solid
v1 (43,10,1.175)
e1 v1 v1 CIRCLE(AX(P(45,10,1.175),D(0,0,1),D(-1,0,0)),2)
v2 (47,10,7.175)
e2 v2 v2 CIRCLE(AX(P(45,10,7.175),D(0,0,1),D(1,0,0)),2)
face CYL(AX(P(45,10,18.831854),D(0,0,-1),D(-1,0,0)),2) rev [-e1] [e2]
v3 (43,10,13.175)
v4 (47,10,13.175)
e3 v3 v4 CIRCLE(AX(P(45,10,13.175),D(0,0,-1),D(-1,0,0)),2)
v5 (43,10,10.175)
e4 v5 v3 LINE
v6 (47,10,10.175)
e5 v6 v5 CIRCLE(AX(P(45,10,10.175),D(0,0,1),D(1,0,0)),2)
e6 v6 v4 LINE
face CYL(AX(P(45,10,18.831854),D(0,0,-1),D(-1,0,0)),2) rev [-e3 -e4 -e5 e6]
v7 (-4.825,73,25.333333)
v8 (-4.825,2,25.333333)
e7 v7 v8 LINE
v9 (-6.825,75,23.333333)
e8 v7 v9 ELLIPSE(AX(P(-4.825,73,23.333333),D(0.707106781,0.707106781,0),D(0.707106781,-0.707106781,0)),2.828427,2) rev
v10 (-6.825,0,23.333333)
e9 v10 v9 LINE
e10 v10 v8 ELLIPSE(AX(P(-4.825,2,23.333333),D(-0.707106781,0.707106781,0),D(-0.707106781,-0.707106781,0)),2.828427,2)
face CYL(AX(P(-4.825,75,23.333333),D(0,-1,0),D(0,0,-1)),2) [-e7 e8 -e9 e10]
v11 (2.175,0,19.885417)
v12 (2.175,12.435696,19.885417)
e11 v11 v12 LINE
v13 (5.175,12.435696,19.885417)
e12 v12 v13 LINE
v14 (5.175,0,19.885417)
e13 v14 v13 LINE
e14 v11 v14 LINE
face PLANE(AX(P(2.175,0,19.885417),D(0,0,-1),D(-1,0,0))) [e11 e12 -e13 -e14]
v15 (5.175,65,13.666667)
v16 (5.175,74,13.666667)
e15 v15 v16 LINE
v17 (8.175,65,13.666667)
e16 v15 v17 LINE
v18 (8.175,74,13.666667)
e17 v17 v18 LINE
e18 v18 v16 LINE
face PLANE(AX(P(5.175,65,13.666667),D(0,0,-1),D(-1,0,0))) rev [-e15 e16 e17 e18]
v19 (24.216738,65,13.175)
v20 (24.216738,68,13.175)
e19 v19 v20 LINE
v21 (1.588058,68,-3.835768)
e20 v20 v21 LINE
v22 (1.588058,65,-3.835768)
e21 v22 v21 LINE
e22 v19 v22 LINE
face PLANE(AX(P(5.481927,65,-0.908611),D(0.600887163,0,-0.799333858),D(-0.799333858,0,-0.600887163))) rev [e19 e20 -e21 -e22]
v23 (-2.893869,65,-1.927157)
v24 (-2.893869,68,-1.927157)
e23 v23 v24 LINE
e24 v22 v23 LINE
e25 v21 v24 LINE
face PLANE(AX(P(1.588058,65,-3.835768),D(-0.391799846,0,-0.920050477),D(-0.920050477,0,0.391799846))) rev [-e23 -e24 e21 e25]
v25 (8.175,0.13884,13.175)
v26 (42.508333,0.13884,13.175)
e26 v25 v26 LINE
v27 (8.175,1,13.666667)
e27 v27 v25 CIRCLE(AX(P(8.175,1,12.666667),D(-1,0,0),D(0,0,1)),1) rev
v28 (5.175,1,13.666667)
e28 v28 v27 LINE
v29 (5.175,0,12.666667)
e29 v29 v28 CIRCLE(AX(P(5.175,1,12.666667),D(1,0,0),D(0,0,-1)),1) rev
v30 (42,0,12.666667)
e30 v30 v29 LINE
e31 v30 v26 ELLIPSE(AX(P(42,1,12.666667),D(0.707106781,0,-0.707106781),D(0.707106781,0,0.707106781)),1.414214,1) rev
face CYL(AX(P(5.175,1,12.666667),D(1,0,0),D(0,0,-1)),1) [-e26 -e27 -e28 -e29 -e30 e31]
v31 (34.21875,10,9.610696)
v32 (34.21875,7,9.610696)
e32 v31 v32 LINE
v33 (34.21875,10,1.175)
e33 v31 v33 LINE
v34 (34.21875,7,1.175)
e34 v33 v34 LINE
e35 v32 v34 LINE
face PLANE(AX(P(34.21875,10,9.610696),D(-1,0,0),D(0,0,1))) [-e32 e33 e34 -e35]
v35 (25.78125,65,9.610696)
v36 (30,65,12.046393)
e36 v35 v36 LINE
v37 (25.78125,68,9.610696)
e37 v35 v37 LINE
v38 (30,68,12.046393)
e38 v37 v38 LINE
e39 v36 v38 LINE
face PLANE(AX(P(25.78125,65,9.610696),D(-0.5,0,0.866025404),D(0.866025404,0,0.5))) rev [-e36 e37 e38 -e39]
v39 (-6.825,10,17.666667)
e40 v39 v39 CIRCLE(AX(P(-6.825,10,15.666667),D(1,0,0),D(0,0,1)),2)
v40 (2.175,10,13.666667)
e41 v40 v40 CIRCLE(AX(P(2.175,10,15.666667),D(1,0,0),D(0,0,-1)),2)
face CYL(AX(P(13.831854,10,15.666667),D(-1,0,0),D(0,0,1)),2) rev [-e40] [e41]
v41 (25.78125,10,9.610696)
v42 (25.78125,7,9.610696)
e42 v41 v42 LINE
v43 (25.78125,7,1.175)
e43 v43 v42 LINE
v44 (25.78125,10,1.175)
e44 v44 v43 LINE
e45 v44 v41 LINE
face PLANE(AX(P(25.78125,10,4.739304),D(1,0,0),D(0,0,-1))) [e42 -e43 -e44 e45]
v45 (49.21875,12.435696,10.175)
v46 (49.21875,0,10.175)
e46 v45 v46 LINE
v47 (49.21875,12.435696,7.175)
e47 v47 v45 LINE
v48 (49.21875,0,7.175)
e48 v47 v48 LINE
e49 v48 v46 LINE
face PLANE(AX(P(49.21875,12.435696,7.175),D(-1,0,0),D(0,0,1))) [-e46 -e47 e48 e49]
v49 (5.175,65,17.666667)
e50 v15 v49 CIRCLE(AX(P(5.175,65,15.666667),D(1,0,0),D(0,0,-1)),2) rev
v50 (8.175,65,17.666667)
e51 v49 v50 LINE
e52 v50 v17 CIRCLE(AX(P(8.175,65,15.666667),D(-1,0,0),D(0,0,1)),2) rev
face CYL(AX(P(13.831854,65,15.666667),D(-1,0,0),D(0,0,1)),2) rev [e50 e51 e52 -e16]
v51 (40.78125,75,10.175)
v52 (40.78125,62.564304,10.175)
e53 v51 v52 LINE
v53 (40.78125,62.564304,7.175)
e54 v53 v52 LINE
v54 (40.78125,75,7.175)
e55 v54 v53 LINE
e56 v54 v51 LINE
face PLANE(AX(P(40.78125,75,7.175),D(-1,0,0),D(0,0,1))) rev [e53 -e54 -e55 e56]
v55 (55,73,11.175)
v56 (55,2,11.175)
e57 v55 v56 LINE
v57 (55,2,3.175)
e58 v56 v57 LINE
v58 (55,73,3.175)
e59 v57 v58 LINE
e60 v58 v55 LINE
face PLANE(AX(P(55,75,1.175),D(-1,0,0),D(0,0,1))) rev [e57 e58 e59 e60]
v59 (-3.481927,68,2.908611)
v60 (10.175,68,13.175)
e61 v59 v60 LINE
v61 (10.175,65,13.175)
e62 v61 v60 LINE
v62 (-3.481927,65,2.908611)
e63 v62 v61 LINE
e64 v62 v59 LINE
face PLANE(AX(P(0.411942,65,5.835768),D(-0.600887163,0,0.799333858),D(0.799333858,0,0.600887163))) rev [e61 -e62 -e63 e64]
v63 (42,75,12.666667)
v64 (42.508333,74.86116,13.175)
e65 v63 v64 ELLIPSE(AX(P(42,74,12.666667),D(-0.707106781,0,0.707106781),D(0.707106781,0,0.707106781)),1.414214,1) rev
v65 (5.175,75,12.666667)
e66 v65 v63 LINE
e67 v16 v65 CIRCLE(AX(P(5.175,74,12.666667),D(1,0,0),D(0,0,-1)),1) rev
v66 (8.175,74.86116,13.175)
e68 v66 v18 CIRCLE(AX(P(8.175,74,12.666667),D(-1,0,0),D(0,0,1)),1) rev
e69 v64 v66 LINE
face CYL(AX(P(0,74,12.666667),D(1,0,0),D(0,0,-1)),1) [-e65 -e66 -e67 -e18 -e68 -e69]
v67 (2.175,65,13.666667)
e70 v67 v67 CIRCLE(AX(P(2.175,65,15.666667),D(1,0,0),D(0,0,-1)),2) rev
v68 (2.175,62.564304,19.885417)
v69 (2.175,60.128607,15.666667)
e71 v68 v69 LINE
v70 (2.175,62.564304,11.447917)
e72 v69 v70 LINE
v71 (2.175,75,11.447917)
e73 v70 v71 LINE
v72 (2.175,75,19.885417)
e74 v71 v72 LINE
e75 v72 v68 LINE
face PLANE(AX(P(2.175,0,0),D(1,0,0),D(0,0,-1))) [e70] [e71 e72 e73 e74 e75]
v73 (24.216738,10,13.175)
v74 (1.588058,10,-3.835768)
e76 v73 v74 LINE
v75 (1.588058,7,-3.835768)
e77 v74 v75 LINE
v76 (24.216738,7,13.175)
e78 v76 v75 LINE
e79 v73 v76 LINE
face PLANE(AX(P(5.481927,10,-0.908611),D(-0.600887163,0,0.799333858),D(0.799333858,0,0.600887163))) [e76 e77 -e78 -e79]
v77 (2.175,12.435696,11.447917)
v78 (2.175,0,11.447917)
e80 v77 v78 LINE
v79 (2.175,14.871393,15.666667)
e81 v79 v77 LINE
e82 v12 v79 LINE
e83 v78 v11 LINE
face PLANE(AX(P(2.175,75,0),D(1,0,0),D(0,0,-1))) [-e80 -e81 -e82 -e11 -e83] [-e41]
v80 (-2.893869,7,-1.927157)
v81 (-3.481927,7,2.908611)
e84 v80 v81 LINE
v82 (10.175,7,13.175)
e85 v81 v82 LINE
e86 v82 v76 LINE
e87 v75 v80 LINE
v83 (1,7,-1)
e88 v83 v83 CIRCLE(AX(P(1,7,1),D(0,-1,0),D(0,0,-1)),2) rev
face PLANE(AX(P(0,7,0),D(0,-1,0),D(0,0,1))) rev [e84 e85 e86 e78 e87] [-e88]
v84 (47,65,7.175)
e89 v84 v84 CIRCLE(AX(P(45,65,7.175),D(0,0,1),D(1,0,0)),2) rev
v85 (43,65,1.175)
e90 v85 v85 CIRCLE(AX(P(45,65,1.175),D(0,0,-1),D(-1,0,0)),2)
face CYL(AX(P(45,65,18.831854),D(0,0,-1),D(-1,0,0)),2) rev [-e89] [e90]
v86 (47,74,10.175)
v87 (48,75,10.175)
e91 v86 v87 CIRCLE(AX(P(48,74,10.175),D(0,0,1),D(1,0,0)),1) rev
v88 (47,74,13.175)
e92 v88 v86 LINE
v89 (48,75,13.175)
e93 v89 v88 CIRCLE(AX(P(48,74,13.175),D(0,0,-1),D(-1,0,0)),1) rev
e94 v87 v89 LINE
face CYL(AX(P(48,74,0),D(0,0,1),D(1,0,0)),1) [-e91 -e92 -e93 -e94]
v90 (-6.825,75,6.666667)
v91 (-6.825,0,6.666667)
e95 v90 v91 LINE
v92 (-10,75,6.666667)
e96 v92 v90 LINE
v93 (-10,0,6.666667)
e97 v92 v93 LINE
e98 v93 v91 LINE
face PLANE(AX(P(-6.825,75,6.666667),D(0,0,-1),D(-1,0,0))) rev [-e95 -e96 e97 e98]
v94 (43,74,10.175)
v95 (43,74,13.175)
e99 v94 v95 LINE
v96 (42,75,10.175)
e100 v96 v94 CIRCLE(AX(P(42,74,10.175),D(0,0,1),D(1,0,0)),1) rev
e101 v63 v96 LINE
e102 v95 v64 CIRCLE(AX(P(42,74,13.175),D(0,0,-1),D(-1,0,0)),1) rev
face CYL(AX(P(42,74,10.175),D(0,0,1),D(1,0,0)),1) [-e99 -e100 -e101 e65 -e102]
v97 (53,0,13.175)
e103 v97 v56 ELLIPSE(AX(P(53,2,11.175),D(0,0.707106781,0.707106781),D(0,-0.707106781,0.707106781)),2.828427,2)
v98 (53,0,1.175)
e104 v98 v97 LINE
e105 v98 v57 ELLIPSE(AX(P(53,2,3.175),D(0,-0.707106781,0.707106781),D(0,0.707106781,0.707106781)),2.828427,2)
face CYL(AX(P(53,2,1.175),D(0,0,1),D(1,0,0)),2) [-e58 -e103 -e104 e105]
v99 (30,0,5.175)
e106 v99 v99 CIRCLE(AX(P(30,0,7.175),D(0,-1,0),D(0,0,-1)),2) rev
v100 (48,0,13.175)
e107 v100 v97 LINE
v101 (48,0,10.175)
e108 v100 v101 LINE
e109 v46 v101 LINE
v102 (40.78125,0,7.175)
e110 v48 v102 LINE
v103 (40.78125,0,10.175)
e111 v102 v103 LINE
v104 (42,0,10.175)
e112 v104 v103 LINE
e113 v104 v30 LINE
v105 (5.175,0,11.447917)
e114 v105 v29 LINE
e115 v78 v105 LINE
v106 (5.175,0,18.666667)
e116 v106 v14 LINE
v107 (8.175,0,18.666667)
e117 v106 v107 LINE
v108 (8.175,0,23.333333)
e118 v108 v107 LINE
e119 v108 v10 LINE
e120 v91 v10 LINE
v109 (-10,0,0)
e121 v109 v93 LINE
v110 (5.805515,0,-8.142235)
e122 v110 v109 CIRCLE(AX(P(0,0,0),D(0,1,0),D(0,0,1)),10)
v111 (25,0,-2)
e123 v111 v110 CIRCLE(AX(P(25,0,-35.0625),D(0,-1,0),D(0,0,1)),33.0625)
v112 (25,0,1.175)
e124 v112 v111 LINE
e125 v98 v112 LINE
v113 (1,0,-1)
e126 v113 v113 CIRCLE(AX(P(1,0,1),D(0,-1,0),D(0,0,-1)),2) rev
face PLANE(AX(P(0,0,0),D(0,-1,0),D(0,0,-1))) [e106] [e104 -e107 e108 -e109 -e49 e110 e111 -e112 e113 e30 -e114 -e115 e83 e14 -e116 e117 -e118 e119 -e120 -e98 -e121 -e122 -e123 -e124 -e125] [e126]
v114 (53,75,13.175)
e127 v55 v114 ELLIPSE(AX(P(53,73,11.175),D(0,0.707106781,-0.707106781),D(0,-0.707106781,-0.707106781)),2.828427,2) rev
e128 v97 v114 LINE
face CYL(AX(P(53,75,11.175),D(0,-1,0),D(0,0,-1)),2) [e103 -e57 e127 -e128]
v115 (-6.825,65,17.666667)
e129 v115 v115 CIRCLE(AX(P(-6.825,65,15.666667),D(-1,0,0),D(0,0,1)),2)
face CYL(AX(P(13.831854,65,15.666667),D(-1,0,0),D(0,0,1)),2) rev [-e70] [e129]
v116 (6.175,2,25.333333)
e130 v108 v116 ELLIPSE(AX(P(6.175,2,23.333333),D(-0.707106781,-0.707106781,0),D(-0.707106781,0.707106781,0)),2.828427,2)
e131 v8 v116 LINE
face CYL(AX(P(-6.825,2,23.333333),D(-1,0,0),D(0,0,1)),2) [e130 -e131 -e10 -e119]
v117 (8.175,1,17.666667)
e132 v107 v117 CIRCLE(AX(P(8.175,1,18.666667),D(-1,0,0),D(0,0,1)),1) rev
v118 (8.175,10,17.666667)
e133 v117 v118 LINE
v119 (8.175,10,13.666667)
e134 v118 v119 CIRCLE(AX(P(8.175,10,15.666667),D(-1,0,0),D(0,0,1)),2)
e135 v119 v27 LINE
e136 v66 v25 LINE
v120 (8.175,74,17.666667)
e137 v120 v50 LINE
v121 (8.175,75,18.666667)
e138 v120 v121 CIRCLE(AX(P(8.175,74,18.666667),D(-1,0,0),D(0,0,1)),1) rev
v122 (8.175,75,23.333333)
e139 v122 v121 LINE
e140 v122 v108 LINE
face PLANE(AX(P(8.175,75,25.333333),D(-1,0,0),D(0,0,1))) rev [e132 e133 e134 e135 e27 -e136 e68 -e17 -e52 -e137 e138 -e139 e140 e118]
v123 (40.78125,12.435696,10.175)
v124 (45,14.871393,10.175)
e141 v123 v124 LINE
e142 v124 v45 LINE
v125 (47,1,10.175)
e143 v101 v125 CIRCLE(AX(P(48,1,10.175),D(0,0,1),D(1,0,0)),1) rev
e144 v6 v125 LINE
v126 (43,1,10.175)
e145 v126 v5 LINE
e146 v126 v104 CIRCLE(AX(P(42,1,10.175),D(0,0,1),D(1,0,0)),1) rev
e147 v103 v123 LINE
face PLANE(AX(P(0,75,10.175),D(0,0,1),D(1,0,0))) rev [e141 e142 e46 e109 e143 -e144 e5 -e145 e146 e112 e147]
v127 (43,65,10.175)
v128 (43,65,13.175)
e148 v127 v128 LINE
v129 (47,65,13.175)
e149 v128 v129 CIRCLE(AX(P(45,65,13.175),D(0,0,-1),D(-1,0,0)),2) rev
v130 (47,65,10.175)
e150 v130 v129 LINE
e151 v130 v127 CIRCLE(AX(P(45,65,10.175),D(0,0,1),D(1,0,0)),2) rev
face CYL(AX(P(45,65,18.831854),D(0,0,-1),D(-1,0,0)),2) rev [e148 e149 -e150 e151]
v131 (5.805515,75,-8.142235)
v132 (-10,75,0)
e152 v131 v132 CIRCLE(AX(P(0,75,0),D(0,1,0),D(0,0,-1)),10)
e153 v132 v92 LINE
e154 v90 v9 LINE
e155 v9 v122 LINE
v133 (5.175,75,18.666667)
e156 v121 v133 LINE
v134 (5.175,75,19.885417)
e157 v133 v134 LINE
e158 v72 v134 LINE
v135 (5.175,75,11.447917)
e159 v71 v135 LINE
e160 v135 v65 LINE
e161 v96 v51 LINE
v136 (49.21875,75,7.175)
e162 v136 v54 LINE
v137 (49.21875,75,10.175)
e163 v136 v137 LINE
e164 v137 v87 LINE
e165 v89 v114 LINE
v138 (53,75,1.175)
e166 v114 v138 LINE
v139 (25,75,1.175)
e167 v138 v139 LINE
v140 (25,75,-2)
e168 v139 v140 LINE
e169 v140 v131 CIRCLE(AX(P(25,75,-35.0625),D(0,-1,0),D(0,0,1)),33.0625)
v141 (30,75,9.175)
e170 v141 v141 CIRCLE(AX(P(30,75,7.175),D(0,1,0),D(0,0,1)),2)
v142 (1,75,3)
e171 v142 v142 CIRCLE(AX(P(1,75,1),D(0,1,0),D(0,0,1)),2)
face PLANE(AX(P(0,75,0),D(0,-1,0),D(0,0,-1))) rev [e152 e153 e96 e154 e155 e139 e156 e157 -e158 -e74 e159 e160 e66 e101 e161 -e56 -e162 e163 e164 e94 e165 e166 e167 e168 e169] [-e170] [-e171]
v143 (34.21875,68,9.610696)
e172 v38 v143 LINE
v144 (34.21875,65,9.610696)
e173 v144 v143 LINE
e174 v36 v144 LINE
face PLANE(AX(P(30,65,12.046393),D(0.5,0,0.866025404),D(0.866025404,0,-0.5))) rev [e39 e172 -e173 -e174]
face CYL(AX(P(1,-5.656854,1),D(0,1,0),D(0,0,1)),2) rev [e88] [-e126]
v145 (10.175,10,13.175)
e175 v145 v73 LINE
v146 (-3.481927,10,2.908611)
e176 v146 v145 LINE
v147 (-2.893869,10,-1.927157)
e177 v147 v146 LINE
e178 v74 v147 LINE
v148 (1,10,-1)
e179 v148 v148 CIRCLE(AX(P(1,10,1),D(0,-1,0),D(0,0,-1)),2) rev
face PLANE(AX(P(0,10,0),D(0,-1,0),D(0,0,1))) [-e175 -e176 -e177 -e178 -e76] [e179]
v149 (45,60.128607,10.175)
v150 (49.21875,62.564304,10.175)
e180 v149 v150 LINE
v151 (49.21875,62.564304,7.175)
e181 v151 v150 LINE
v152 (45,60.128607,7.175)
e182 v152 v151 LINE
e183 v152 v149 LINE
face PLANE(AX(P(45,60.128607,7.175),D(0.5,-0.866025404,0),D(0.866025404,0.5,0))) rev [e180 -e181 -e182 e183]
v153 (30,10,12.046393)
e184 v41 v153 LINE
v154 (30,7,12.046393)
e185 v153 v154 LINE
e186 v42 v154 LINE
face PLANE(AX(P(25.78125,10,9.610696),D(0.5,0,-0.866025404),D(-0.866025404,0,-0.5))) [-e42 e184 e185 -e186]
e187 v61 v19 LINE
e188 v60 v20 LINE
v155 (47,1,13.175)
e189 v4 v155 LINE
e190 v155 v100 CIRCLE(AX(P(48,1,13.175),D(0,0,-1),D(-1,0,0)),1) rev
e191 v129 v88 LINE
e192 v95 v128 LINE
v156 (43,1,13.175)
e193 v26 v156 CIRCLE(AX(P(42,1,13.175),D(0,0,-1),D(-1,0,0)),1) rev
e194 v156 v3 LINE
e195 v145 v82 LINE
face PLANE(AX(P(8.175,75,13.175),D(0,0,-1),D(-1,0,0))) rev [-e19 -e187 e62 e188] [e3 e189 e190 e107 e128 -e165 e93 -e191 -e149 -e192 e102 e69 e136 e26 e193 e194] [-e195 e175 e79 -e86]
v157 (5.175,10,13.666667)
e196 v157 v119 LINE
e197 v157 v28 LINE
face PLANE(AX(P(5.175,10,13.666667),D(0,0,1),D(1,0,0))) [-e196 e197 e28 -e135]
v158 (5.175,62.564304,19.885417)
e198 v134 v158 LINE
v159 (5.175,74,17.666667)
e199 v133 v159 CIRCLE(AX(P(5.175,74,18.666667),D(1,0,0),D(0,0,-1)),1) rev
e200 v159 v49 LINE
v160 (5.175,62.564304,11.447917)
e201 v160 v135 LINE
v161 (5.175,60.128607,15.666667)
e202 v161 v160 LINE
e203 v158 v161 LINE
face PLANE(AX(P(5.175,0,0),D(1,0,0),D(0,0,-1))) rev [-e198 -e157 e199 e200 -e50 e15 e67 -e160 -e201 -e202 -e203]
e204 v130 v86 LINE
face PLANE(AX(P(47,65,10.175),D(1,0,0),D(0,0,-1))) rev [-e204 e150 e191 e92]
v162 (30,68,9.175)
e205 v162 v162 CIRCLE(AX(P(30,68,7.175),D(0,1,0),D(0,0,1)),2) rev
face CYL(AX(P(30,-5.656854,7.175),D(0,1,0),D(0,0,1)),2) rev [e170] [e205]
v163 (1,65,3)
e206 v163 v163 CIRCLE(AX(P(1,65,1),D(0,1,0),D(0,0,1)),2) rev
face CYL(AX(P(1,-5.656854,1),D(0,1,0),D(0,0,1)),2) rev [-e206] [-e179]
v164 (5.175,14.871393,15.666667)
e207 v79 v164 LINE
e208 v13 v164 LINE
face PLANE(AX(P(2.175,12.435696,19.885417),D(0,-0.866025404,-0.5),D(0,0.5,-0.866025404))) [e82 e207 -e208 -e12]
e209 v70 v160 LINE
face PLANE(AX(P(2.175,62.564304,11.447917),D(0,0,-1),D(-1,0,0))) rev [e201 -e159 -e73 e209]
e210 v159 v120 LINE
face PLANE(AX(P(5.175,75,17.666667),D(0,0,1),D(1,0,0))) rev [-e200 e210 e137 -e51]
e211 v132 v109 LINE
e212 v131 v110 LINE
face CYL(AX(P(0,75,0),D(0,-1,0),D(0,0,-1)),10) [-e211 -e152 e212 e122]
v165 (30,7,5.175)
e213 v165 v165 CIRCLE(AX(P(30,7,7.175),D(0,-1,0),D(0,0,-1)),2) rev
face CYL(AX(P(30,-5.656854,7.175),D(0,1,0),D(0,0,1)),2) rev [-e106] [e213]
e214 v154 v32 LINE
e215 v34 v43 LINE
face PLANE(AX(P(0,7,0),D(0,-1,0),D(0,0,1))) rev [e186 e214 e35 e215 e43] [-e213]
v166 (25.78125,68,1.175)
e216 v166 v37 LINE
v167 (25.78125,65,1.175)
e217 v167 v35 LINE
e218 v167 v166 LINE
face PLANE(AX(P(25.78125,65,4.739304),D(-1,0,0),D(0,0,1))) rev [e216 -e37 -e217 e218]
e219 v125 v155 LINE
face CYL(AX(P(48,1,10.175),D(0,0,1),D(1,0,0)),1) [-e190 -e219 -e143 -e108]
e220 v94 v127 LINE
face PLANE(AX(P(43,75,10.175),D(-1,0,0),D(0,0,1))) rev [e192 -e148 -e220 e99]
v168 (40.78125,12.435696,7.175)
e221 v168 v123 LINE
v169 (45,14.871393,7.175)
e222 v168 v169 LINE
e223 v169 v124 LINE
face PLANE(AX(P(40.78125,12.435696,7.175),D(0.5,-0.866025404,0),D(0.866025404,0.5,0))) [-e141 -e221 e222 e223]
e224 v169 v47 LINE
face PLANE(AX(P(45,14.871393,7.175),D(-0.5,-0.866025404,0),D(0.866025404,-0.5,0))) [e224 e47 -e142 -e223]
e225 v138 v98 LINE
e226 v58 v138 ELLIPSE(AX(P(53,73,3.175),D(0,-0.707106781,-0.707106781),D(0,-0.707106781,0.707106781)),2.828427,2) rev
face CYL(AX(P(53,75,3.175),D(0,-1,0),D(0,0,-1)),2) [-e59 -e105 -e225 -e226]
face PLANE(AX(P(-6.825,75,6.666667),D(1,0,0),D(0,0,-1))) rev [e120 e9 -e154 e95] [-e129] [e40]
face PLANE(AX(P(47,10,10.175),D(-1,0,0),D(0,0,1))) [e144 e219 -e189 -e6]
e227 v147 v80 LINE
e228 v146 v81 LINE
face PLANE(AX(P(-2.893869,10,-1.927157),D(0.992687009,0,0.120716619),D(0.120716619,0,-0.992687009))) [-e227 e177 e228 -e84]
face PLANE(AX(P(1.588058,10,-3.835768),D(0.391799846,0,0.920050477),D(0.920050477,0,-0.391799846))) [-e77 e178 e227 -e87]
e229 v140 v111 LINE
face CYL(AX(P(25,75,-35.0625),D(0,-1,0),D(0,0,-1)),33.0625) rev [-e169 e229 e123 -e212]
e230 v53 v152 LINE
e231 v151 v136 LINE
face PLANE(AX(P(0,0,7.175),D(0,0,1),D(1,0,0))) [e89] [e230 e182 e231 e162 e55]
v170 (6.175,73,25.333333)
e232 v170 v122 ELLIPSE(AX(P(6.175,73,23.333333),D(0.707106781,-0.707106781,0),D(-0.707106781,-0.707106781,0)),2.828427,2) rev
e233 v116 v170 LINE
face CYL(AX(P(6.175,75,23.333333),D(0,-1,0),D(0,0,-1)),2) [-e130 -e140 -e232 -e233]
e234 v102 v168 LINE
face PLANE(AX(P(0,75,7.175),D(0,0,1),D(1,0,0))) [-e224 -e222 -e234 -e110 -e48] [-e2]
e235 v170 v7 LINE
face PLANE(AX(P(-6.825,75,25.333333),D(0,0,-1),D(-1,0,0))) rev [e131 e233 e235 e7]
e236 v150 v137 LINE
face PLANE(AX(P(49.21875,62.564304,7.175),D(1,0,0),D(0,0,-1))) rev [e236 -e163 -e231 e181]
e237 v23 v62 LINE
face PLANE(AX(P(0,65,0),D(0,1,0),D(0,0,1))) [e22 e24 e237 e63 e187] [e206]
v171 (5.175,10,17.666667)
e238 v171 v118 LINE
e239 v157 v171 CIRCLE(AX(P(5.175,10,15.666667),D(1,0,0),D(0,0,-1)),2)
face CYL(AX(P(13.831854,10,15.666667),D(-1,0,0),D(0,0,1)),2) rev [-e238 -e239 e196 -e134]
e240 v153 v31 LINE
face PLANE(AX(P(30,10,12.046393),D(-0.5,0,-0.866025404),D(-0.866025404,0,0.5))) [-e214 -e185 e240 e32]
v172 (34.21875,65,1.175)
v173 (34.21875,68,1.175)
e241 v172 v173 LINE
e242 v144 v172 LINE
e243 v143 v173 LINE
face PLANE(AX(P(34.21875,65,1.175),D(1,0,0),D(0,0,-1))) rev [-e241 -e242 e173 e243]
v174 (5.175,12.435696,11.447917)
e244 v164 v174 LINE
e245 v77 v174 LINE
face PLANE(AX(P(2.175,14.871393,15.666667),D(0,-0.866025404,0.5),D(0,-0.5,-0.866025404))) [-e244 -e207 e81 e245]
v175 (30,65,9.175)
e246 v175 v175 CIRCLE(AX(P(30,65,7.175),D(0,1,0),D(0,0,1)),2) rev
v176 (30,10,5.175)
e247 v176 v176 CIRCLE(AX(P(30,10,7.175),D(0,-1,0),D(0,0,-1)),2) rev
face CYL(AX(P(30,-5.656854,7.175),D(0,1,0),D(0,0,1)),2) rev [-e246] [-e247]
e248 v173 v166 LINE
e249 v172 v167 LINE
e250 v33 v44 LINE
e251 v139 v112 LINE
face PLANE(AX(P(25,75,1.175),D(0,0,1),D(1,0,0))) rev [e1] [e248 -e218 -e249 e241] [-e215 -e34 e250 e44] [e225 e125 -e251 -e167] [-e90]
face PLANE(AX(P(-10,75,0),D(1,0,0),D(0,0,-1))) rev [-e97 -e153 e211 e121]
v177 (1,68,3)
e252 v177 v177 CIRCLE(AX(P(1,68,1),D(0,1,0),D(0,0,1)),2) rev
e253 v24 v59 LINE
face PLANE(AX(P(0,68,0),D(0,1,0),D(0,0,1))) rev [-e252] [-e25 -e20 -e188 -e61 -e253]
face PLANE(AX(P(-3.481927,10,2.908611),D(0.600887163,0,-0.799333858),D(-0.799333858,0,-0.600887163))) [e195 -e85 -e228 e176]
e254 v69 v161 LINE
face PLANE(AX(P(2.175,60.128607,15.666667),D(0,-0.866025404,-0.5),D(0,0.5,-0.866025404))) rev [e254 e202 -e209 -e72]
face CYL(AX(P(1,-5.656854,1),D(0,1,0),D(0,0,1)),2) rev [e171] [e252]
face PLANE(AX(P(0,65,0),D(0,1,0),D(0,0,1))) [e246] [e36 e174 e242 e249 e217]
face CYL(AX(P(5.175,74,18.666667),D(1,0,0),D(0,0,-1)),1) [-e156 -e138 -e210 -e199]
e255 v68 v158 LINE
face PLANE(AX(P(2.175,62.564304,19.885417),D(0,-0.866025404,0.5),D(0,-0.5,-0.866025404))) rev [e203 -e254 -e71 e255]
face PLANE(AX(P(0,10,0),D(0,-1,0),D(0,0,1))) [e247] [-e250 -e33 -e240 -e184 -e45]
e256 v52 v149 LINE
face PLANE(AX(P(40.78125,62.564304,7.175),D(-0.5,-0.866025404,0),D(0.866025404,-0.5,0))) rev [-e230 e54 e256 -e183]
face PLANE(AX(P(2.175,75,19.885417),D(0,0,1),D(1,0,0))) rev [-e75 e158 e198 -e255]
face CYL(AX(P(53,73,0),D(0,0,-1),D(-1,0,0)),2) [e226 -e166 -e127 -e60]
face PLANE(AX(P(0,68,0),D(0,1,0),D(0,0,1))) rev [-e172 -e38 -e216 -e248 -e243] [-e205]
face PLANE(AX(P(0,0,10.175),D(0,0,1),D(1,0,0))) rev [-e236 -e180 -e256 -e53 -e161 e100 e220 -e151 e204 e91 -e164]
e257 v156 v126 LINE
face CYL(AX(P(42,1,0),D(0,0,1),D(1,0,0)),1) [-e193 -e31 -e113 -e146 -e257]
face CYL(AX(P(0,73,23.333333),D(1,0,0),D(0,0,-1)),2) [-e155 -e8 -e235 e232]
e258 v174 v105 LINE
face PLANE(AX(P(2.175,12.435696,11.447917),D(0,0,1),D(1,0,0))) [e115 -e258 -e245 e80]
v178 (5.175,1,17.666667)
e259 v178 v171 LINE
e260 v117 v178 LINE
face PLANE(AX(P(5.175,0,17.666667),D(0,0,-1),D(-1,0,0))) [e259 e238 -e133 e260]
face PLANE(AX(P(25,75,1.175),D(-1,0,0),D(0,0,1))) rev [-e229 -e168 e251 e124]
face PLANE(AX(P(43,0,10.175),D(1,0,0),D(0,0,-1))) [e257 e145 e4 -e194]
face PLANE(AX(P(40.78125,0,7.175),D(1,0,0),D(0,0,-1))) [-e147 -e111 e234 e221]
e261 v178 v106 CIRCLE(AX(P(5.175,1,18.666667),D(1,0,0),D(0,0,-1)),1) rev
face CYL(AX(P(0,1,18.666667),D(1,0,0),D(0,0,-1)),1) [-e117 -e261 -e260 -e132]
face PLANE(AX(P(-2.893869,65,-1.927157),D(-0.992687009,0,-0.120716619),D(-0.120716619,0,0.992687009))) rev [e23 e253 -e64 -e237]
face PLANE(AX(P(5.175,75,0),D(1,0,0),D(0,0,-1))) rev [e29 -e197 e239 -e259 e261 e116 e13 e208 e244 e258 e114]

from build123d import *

# Parameters (mm, degrees)
BOSS_EXTRUDE1_DEPTH = 75
SKETCH2_R           = 2
CUT_EXTRUDE1_DEPTH  = 15
SKETCH4_R           = 2
CUT_EXTRUDE2_DEPTH  = 12
SKETCH3_R           = 2
CUT_EXTRUDE3_DEPTH  = 75
CUT_EXTRUDE4_START  = -3
CUT_EXTRUDE4_DEPTH  = 3
CUT_EXTRUDE5_START  = -3
CUT_EXTRUDE5_DEPTH  = 3
CUT_EXTRUDE6_START  = -3
CUT_EXTRUDE6_DEPTH  = 3
CUT_EXTRUDE7_START  = -3
CUT_EXTRUDE7_DEPTH  = 3
CUT_EXTRUDE8_START  = -7
CUT_EXTRUDE8_DEPTH  = 3
FILLET2_START       = 5.175
FILLET2_DEPTH       = 42.1845
FILLET2_START_2     = 10.175
FILLET2_2_DEPTH     = 3.491666667
FILLET2_3_DEPTH     = 37.825
FILLET3_R           = 2


with BuildPart() as part:
    # Sketch1 → Boss-Extrude1 (new body)
    with BuildSketch(Plane(origin=(0, 0, 0), x_dir=(1, 0, 0), z_dir=(0, 1, 0))):
        with BuildLine():
            Line((-6.825, -6.666666667), (-6.825, -25.333333333))
            Line((-6.825, -25.333333333), (8.175, -25.333333333))
            Line((8.175, -25.333333333), (8.175, -13.175))
            Line((8.175, -13.175), (55, -13.175))
            Line((55, -13.175), (55, -1.175))
            Line((55, -1.175), (25, -1.175))
            Line((25, -1.175), (25, 2))
            ThreePointArc((25, 2), (14.923352523, 3.572976633), (5.805515239, 8.142235123))
            ThreePointArc((5.805515239, 8.142235123), (3.047757271, 9.524241472), (0, 10))
            ThreePointArc((0, 10), (-7.071067812, 7.071067812), (-10, 0))
            Line((-10, 0), (-10, -6.666666667))
            Line((-10, -6.666666667), (-6.825, -6.666666667))
        make_face()
    extrude(amount=BOSS_EXTRUDE1_DEPTH)

    # Sketch2 → Cut-Extrude1 (cut)
    with BuildSketch(Plane.ZY.offset(6.825)):
        with Locations((15.666666667, 65)):
            Circle(SKETCH2_R)
    cut_extrude1 = extrude(amount=-CUT_EXTRUDE1_DEPTH, mode=Mode.SUBTRACT)

    # Sketch4 → Cut-Extrude2 (cut)
    with BuildSketch(Plane(origin=(0, 0, 1.175), x_dir=(-1, 0, 0), z_dir=(0, 0, -1))):
        with Locations((-45, 65)):
            Circle(SKETCH4_R)
    cut_extrude2 = extrude(amount=-CUT_EXTRUDE2_DEPTH, mode=Mode.SUBTRACT)

    # Sketch3 → Cut-Extrude3 (cut)
    with BuildSketch(Plane(origin=(0, 75, 0), x_dir=(1, 0, 0), z_dir=(0, 1, 0))):
        with Locations(Location((1, -1, 0), (0, 0, 270))):
            Circle(SKETCH3_R)
        with Locations(Location((30, -7.175, 0), (0, 0, 270))):
            Circle(SKETCH3_R)
    extrude(amount=-CUT_EXTRUDE3_DEPTH, mode=Mode.SUBTRACT)

    # Sketch5 → Cut-Extrude4 (cut)
    with BuildSketch(Plane(origin=(8.175, 0, 0), x_dir=(0, 0, -1), z_dir=(1, 0, 0)).offset(CUT_EXTRUDE4_START)):
        Polygon((-19.885416667, 62.564303552), (-15.666666667, 60.128607104), (-11.447916667, 62.564303552), (-11.447916667, 75), (-19.885416667, 75), align=None)
    cut_extrude4 = extrude(amount=-CUT_EXTRUDE4_DEPTH, mode=Mode.SUBTRACT)

    # Sketch6 → Cut-Extrude5 (cut)
    with BuildSketch(Plane(origin=(8.175, 0, 0), x_dir=(0, 0, -1), z_dir=(1, 0, 0)).offset(CUT_EXTRUDE5_START)):
        with BuildLine():
            Line((-13.666666667, 65), (-13.666666667, 75))
            Line((-13.666666667, 75), (-17.666666667, 75))
            Line((-17.666666667, 75), (-17.666666667, 65))
            ThreePointArc((-17.666666667, 65), (-15.666666667, 67), (-13.666666667, 65))
        make_face()
    cut_extrude5 = extrude(amount=CUT_EXTRUDE5_DEPTH, mode=Mode.SUBTRACT)

    # Sketch7 → Cut-Extrude6 (cut)
    with BuildSketch(Plane.XY.offset(13.175).offset(CUT_EXTRUDE6_START)):
        Polygon((40.78125, 62.564303552), (45, 60.128607104), (49.21875, 62.564303552), (49.21875, 75), (40.78125, 75), align=None)
    cut_extrude6 = extrude(amount=-CUT_EXTRUDE6_DEPTH, mode=Mode.SUBTRACT)

    # Sketch8 → Cut-Extrude7 (cut)
    with BuildSketch(Plane.XY.offset(13.175).offset(CUT_EXTRUDE7_START)):
        with BuildLine():
            Line((47, 65), (47, 75))
            Line((47, 75), (43, 75))
            Line((43, 75), (43, 65))
            ThreePointArc((43, 65), (45, 67), (47, 65))
        make_face()
    cut_extrude7 = extrude(amount=CUT_EXTRUDE7_DEPTH, mode=Mode.SUBTRACT)

    # Sketch10 → Cut-Extrude8 (cut)
    with BuildSketch(Plane(origin=(0, 75, 0), x_dir=(1, 0, 0), z_dir=(0, 1, 0)).offset(CUT_EXTRUDE8_START)):
        Polygon((0.411941919, -5.835768444), (10.175, -13.175), (24.216737808, -13.175), (5.48192736, 0.908610985), (1.588058081, 3.835768444), (-2.893869279, 1.927157459), (-3.48192736, -2.908610985), align=None)
        Polygon((25.78125, -4.739303552), (25.78125, -1.175), (34.21875, -1.175), (34.21875, -4.739303552), (34.21875, -9.610696448), (30, -12.046392896), (25.78125, -9.610696448), align=None)
    cut_extrude8 = extrude(amount=-CUT_EXTRUDE8_DEPTH, mode=Mode.SUBTRACT)

    # Mirror2: Cut-Extrude1, Cut-Extrude2, Cut-Extrude4, Cut-Extrude5, Cut-Extrude6, Cut-Extrude7, Cut-Extrude8 across plane
    add(cut_extrude1.mirror(Plane.ZX.offset(37.5)), mode=Mode.SUBTRACT)
    add(cut_extrude2.mirror(Plane.ZX.offset(37.5)), mode=Mode.SUBTRACT)
    add(cut_extrude4.mirror(Plane.ZX.offset(37.5)), mode=Mode.SUBTRACT)
    add(cut_extrude5.mirror(Plane.ZX.offset(37.5)), mode=Mode.SUBTRACT)
    add(cut_extrude6.mirror(Plane.ZX.offset(37.5)), mode=Mode.SUBTRACT)
    add(cut_extrude7.mirror(Plane.ZX.offset(37.5)), mode=Mode.SUBTRACT)
    add(cut_extrude8.mirror(Plane.ZX.offset(37.5)), mode=Mode.SUBTRACT)

    # Fillet2: read off the stored shape, not the designer's step
    # Fillet2 outline → Fillet2 (cut)
    with BuildSketch(Plane.YZ.offset(FILLET2_START)):
        with BuildLine():
            Line((1, 13.666666667), (0, 13.666666667))
            Line((0, 13.666666667), (0, 12.666666667))
            ThreePointArc((0, 12.666666667), (0.292893219, 13.373773448), (1, 13.666666667))
        make_face()
        with BuildLine():
            ThreePointArc((1, 17.666666667), (0.292893218, 17.959559886), (0, 18.666666667))
            Line((0, 18.666666667), (0, 17.666666667))
            Line((0, 17.666666667), (1, 17.666666667))
        make_face()
    extrude(amount=FILLET2_DEPTH, mode=Mode.SUBTRACT)

    # Fillet2 2 outline → Fillet2 2 (cut)
    with BuildSketch(Plane.XY.offset(FILLET2_START_2)):
        with BuildLine():
            Line((47, 1), (47, 0))
            Line((47, 0), (47.3595, 0))
            Line((47.3595, 0), (48, 0))
            ThreePointArc((48, 0), (47.292893219, 0.292893219), (47, 1))
        make_face()
        with BuildLine():
            Line((48, 75), (47, 75))
            Line((47, 75), (47, 74))
            ThreePointArc((47, 74), (47.292893219, 74.707106781), (48, 75))
        make_face()
        with BuildLine():
            Line((43, 75), (42, 75))
            ThreePointArc((42, 75), (42.707106781, 74.707106781), (43, 74))
            Line((43, 74), (43, 75))
        make_face()
        with BuildLine():
            ThreePointArc((43, 1), (42.707106781, 0.292893219), (42, 0))
            Line((42, 0), (43, 0))
            Line((43, 0), (43, 1))
        make_face()
    extrude(amount=FILLET2_2_DEPTH, mode=Mode.SUBTRACT)

    # Fillet2 3 outline → Fillet2 3 (cut)
    with BuildSketch(Plane.YZ.offset(FILLET2_START)):
        with BuildLine():
            Line((74, 17.666666667), (75, 17.666666667))
            Line((75, 17.666666667), (75, 18.666666667))
            ThreePointArc((75, 18.666666667), (74.707106782, 17.959559886), (74, 17.666666667))
        make_face()
        with BuildLine():
            Line((75, 12.666666667), (75, 13.666666667))
            Line((75, 13.666666667), (74, 13.666666667))
            ThreePointArc((74, 13.666666667), (74.707106781, 13.373773448), (75, 12.666666667))
        make_face()
    extrude(amount=FILLET2_3_DEPTH, mode=Mode.SUBTRACT)

    # Fillet3
    fillet3_edges = [part.edges().sort_by_distance(p)[0] for p in [
        (55, 0, 7.175),
        (0.675, 0, 25.333333333),
        (55, 37.5, 1.175),
        (55, 37.5, 13.175),
        (8.175, 37.5, 25.333333333),
        (-6.825, 37.5, 25.333333333),
        (0.675, 75, 25.333333333),
        (55, 75, 7.175),
    ]]
    fillet(fillet3_edges, radius=FILLET3_R)


solid = part.part
